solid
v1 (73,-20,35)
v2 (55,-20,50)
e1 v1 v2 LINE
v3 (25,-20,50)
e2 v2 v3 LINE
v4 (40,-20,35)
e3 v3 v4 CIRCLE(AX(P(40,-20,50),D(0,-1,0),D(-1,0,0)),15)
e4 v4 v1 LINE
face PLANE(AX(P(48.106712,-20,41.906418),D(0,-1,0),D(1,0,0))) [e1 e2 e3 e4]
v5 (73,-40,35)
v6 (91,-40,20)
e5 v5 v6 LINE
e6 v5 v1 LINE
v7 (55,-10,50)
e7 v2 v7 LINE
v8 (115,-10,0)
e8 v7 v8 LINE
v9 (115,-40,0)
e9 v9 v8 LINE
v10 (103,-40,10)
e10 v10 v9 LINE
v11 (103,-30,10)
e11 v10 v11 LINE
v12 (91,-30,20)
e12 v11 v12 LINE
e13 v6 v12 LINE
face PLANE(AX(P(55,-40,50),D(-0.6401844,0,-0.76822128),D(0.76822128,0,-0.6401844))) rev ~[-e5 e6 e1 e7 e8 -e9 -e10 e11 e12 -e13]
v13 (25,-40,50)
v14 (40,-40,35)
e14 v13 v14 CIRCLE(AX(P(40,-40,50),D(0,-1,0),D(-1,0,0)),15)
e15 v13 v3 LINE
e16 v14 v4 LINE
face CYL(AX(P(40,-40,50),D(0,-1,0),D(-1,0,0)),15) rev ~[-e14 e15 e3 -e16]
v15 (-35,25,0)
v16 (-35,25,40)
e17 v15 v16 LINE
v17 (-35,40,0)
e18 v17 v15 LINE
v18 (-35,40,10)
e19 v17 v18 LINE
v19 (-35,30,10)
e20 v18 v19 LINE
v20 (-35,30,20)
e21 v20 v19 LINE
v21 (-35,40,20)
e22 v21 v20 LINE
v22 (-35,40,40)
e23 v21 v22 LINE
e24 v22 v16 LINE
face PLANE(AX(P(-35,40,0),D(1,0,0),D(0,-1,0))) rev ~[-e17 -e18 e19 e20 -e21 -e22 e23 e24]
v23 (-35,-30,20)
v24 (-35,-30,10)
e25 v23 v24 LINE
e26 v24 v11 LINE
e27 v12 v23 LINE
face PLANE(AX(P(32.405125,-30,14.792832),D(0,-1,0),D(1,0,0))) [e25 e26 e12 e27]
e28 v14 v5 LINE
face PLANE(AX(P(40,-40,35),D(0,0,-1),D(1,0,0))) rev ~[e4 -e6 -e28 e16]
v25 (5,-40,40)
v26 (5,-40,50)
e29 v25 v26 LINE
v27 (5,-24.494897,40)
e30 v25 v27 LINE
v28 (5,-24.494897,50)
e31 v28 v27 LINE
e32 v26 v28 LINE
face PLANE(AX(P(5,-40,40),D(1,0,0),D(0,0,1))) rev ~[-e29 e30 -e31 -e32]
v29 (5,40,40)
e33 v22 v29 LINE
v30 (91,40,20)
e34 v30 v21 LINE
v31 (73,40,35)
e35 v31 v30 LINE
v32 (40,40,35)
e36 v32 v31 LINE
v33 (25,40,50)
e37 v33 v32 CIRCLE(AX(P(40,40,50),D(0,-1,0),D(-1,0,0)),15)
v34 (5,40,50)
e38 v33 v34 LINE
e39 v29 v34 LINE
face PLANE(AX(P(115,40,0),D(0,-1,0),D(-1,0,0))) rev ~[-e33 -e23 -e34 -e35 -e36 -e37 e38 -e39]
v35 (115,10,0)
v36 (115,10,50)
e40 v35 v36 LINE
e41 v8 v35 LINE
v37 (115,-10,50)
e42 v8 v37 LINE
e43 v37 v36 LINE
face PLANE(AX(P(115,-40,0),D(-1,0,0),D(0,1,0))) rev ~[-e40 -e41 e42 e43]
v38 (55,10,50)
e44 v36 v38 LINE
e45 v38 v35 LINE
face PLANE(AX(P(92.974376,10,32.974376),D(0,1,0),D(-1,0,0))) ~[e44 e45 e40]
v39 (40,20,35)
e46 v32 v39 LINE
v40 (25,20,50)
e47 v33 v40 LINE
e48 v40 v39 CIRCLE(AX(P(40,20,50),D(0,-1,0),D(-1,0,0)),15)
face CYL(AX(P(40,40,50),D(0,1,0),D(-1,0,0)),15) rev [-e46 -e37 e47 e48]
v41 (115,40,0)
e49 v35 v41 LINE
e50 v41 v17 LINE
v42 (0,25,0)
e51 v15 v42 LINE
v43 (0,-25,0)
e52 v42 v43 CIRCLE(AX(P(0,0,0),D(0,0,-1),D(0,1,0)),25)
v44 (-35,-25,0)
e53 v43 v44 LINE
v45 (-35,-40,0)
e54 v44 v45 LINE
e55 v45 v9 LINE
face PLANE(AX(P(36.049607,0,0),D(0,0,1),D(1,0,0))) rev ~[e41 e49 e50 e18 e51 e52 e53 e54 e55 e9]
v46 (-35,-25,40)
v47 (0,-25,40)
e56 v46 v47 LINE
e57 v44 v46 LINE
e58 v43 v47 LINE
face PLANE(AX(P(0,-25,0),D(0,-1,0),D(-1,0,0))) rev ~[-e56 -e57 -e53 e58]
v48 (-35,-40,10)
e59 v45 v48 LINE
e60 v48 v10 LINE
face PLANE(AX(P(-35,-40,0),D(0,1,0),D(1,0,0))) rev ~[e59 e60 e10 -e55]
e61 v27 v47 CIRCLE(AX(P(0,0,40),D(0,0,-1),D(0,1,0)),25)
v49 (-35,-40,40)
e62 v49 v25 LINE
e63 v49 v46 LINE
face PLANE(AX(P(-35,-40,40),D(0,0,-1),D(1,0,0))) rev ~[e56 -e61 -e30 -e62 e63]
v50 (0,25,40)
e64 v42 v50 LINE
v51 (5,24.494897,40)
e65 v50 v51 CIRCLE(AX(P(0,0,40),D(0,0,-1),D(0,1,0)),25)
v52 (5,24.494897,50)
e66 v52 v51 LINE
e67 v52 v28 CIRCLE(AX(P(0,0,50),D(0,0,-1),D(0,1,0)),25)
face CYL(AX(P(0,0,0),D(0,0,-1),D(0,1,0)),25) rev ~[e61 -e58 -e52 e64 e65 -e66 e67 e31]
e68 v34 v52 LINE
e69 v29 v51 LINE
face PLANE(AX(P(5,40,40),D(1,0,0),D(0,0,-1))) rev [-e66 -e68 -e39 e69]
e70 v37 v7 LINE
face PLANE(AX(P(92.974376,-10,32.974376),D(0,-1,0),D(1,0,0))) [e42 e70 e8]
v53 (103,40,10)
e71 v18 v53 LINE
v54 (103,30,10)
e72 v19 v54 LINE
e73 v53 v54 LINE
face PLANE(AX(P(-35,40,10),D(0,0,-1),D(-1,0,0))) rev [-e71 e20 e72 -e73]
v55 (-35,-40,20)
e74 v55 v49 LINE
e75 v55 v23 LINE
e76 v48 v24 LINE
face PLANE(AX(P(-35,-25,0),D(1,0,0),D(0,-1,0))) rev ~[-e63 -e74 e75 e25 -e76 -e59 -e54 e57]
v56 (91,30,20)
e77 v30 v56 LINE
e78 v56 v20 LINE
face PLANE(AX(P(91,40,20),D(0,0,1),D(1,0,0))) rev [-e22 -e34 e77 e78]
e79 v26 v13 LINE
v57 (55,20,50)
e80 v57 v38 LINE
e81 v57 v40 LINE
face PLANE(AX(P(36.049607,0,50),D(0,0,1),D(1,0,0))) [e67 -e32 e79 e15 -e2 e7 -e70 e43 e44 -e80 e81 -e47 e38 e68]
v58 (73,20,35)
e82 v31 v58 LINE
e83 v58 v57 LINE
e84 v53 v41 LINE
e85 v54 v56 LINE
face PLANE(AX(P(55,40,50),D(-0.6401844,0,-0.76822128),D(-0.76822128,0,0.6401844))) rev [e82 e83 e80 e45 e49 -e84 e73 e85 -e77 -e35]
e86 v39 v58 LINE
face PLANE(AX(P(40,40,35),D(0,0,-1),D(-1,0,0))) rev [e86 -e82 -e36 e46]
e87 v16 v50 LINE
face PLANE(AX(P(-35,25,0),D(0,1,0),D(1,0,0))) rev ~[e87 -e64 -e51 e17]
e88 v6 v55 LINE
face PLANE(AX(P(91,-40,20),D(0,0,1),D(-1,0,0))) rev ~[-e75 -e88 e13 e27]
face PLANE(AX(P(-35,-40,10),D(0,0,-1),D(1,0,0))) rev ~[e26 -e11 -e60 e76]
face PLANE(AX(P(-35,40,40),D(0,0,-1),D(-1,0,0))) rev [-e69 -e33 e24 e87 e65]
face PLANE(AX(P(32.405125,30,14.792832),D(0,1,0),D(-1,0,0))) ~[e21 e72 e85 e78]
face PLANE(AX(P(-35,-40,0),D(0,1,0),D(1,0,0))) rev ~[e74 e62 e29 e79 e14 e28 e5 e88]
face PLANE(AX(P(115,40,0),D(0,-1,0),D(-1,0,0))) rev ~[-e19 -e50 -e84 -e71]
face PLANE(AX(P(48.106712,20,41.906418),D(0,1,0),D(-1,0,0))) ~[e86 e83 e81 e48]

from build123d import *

# Parameters (mm, degrees)
F1_DEPTH = 50
F2_W     = 40
F2_H     = 10
F3_DEPTH = 30
F4_DEPTH = 10
F5_DEPTH = 20


# Not quite as in the source:
# - a pattern or mirror of a feature is missing from the dataset's text; its kind, count and spacing are read off the source's solid


with BuildPart() as f1:
    # F0 (on Top) → F1 (new body)
    with BuildSketch(Plane.XY):
        with BuildLine():
            Line((-35, -25), (-35, -40))
            Line((-35, -40), (115, -40))
            Line((115, -40), (115, 40))
            Line((115, 40), (-35, 40))
            Line((-35, 40), (-35, 25))
            Line((-35, 25), (0, 25))
            ThreePointArc((0, 25), (25, 0), (0, -25))
            Line((0, -25), (-35, -25))
        make_face()
    extrude(amount=F1_DEPTH)

    # F2 (on face) → F3 (cut)
    with BuildSketch(Plane.XZ.offset(40)):
        with Locations((-15, 45)):
            Rectangle(F2_W, F2_H)
        Polygon((115, 50), (55, 50), (73, 35), (91, 20), (103, 10), (115, 0), align=None)
    f3 = extrude(amount=-F3_DEPTH, mode=Mode.SUBTRACT)

    # F3_copies: F3 across plane
    add(f3.mirror(Plane.ZX), mode=Mode.SUBTRACT)

    # F2 (on face) → F4 (cut)
    with BuildSketch(Plane.XZ.offset(40)):
        Polygon((91, 20), (-35, 20), (-35, 10), (103, 10), align=None)
    f4 = extrude(amount=-F4_DEPTH, mode=Mode.SUBTRACT)

    # F4_copies: F4 across plane
    add(f4.mirror(Plane.ZX), mode=Mode.SUBTRACT)

    # F2 (on face) → F5 (cut)
    with BuildSketch(Plane.XZ.offset(40)):
        with BuildLine():
            Line((55, 50), (25, 50))
            ThreePointArc((25, 50), (29.3933982822, 39.3933982822), (40, 35))
            Line((40, 35), (73, 35))
            Line((73, 35), (55, 50))
        make_face()
    f5 = extrude(amount=-F5_DEPTH, mode=Mode.SUBTRACT)

    # F5_copies: F5 across plane
    add(f5.mirror(Plane.ZX), mode=Mode.SUBTRACT)


solid = f1.part
